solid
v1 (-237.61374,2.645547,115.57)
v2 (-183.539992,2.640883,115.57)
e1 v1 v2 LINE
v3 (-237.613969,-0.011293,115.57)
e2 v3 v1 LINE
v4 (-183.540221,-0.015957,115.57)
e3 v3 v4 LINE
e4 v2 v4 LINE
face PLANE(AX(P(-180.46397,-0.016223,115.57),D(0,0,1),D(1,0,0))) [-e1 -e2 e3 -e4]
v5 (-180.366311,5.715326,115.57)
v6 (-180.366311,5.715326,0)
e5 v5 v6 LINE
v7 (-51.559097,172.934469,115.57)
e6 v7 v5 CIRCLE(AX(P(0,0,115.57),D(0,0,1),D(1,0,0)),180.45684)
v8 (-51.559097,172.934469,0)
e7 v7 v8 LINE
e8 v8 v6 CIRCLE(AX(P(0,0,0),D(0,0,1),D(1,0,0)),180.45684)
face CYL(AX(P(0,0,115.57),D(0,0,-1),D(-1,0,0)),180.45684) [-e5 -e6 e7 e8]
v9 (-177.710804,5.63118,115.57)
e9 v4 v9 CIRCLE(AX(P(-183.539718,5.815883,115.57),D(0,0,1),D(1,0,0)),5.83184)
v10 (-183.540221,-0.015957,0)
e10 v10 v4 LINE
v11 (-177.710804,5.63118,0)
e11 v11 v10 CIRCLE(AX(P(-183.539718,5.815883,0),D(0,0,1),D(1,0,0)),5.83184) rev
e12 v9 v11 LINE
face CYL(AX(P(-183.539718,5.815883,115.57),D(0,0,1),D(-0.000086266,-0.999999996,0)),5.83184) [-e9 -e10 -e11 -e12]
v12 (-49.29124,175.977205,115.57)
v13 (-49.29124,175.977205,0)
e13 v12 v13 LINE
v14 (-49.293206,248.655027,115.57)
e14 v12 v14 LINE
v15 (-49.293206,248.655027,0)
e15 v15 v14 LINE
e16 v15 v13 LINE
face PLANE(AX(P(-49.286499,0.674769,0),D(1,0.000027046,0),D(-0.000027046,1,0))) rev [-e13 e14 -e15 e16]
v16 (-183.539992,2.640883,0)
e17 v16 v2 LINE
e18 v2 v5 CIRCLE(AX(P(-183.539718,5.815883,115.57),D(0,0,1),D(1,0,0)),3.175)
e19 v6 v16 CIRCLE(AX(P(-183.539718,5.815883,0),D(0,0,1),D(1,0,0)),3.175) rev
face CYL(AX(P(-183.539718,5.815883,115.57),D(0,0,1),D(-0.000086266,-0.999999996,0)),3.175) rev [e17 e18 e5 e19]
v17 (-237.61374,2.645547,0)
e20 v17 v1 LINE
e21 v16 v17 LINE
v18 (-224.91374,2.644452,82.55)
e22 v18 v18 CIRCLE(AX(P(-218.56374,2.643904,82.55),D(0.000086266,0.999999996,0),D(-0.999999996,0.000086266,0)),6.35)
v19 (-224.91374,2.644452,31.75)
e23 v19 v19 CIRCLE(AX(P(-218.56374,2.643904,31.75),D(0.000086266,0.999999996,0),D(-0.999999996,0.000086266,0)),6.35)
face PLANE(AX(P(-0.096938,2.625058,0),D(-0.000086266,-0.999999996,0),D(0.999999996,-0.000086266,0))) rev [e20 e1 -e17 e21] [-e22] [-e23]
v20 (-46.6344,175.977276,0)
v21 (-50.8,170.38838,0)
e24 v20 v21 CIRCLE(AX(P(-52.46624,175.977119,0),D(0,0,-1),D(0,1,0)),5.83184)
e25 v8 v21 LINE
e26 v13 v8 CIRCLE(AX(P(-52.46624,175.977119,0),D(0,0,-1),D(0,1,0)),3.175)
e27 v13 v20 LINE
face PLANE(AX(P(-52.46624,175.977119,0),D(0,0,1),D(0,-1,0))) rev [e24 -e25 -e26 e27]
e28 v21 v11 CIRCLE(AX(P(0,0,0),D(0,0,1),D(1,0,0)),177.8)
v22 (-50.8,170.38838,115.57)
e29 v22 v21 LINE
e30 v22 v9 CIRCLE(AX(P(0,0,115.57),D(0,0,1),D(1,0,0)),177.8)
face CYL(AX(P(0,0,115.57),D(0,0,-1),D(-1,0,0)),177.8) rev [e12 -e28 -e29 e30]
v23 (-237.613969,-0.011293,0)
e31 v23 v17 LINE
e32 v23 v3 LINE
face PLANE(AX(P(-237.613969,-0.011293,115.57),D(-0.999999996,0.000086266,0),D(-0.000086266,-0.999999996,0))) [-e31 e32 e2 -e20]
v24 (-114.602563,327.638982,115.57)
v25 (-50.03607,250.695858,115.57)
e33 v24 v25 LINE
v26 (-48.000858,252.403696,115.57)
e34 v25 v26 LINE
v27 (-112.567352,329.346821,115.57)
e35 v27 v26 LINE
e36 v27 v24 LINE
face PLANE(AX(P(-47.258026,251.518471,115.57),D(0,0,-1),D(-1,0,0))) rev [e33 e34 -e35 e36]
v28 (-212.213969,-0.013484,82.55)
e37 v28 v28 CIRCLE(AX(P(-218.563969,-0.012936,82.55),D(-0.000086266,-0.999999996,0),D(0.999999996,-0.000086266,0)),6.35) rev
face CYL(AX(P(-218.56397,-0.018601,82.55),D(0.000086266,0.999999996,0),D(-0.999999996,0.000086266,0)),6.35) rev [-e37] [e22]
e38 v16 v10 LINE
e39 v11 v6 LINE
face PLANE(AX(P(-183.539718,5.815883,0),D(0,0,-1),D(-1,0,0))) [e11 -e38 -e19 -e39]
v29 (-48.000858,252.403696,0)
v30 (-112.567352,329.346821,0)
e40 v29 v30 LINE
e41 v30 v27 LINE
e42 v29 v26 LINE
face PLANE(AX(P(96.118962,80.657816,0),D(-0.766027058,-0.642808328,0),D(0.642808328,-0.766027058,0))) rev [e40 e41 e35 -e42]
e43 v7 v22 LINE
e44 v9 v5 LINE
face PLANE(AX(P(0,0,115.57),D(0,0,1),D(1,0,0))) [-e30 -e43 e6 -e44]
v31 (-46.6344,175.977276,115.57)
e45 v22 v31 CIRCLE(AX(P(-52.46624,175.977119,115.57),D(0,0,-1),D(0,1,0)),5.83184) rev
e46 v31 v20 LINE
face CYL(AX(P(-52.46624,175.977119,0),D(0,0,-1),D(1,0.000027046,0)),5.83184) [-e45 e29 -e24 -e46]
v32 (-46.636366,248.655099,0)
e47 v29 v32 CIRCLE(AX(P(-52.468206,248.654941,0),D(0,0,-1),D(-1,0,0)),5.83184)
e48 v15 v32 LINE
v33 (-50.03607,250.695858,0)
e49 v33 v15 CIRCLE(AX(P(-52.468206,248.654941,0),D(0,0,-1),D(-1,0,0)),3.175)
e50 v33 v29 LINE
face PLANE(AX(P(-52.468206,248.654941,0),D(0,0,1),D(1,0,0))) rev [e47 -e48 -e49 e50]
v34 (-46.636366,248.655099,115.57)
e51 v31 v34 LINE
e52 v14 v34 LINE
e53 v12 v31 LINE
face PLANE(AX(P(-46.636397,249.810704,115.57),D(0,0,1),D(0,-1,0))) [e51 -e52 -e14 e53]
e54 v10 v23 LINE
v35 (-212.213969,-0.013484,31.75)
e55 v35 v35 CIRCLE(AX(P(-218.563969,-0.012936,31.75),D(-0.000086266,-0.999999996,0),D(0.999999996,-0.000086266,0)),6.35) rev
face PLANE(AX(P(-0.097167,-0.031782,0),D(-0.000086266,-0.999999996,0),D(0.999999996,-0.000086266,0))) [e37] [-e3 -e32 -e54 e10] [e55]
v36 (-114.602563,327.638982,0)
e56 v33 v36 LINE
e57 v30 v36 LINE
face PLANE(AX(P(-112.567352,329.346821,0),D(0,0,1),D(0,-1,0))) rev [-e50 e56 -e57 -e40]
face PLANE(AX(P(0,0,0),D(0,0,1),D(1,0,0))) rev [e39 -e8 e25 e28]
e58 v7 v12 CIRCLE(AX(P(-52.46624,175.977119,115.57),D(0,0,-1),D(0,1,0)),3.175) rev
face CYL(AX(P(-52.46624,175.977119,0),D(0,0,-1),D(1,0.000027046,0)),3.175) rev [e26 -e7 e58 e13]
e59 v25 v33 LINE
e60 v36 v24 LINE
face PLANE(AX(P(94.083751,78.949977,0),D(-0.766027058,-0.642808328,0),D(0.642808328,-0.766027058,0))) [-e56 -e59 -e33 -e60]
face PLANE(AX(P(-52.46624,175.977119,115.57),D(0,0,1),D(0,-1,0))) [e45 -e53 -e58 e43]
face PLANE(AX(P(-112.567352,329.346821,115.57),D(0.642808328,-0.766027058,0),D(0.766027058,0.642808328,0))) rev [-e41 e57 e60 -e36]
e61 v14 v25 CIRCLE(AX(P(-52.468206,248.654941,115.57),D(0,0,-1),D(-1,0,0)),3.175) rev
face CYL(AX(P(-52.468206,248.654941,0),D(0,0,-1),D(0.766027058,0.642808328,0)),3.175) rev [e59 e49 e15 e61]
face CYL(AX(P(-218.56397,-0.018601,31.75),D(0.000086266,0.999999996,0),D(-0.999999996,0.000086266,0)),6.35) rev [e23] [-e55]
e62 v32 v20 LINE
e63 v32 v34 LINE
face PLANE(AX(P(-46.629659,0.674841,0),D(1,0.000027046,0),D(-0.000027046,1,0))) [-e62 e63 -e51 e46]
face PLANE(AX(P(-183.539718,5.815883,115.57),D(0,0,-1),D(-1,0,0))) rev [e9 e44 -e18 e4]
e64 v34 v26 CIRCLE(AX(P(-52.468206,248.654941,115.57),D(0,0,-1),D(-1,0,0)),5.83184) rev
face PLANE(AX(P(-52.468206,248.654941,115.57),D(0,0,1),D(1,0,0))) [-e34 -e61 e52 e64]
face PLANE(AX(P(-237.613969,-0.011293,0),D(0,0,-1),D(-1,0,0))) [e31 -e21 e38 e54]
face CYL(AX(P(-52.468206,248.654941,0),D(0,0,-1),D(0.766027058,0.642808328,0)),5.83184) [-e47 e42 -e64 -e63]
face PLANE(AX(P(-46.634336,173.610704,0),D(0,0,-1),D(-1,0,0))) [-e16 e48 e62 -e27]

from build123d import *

# Parameters (mm, degrees)
BASE_FLANGE1_DEPTH           = 115.57
EDGE_FLANGE1_DEPTH           = 115.57
EDGE_FLANGE2_STRIP_CUT_DEPTH = 115.57
EDGE_FLANGE2_DEPTH           = 115.57
EDGE_FLANGE3_DEPTH           = 115.57
SKETCH20_R                   = 6.35
CUT_EXTRUDE1_DEPTH           = 2.65684


# Sheet-metal steps are written as plain solids
with BuildPart() as part:
    # Sketch1 → Base-Flange1 (new body)
    with BuildSketch(Plane.XY):
        with BuildLine():
            ThreePointArc((-50.8, 170.388379885), (-140.856418383, 108.500273734), (-177.710803869, 5.63118))
            Line((-177.710803869, 5.63118), (-180.366311024, 5.715325918))
            ThreePointArc((-180.366311024, 5.715325918), (-142.961215721, 110.121577824), (-51.559097143, 172.934469105))
            Line((-51.559097143, 172.934469105), (-50.8, 170.388379885))
        make_face()
    extrude(amount=BASE_FLANGE1_DEPTH)

    # Edge-Flange1 section (across the edge) → Edge-Flange1 (add)
    with BuildSketch(Plane(origin=(-49.291175996, 173.610632552, 115.57), x_dir=(-0.9999999996342678, -2.7045604981235094e-05, 0), z_dir=(0, 0, -1))):
        with BuildLine():
            Line((-2.65684, 2.366572064), (-2.65684, 76.2))
            Line((-2.65684, 76.2), (0, 76.2))
            Line((0, 76.2), (0, 2.366572064))
            ThreePointArc((0, 2.366572064), (0.62936233, 0.469112223), (2.267939433, -0.676102109))
            Line((2.267939433, -0.676102109), (1.508911151, -3.222211858))
            ThreePointArc((1.508911151, -3.222211858), (-1.500827273, -1.118682173), (-2.65684, 2.366572064))
        make_face()
    extrude(amount=EDGE_FLANGE1_DEPTH)

    # Edge-Flange2 strip (across the edge) → Edge-Flange2 strip cut (cut)
    with BuildSketch(Plane(origin=(-49.293236871, 249.810632524, 115.57), x_dir=(-0.766027058259036, -0.6428083275868535, 0), z_dir=(0, 0, -1))):
        Polygon((-12.205285278, 10.412383287), (-1.292448625, -2.593029), (0.742808893, -0.885245167), (-10.17002776, 12.12016712), align=None)
    extrude(amount=EDGE_FLANGE2_STRIP_CUT_DEPTH, mode=Mode.SUBTRACT)

    # Edge-Flange2 section (across the edge) → Edge-Flange2 (add)
    with BuildSketch(Plane(origin=(-49.293236871, 249.810632524, 115.57), x_dir=(-0.766027058259036, -0.6428083275868535, 0), z_dir=(0, 0, -1))):
        with BuildLine():
            Line((-2.65684, 1.155605494), (-2.65684, 101.6))
            Line((-2.65684, 101.6), (0, 101.6))
            Line((0, 101.6), (0, 1.155605494))
            ThreePointArc((0, 1.155605494), (0.191475929, 0.069691539), (0.742808893, -0.885245167))
            Line((0.742808893, -0.885245167), (-1.292448625, -2.593029))
            ThreePointArc((-1.292448625, -2.593029), (-2.305137014, -0.839001259), (-2.65684, 1.155605494))
        make_face()
    extrude(amount=EDGE_FLANGE2_DEPTH)

    # Edge-Flange3 section (across the edge) → Edge-Flange3 (add)
    with BuildSketch(Plane(origin=(-180.463740314, 2.640617339, 0), x_dir=(8.626632785422443e-05, 0.9999999962790604, 0), z_dir=(0, 0, 1))):
        with BuildLine():
            Line((-2.65684, 3.076251829), (-2.65684, 57.15))
            Line((-2.65684, 57.15), (0, 57.15))
            Line((0, 57.15), (0, 3.076251829))
            ThreePointArc((0, 3.076251829), (0.894756196, 0.86692768), (3.074716973, -0.097164046))
            Line((3.074716973, -0.097164046), (2.990800136, -2.75267845))
            ThreePointArc((2.990800136, -2.75267845), (-1.013351819, -0.981834768), (-2.65684, 3.076251829))
        make_face()
    extrude(amount=EDGE_FLANGE3_DEPTH)

    # Sketch20 → Cut-Extrude1 (cut)
    with BuildSketch(Plane(origin=(0.000226453, 2.625049375, 0), x_dir=(0.9999999962790604, -8.626632785420363e-05, 0), z_dir=(8.626632785420363e-05, 0.9999999962790604, 0))):
        with Locations(Location((-218.563967439, -31.75, 0), (0, 0, 180))):
            Circle(SKETCH20_R)
        with Locations(Location((-218.563967439, -82.55, 0), (0, 0, 180))):
            Circle(SKETCH20_R)
    extrude(amount=-CUT_EXTRUDE1_DEPTH, mode=Mode.SUBTRACT)


solid = part.part
